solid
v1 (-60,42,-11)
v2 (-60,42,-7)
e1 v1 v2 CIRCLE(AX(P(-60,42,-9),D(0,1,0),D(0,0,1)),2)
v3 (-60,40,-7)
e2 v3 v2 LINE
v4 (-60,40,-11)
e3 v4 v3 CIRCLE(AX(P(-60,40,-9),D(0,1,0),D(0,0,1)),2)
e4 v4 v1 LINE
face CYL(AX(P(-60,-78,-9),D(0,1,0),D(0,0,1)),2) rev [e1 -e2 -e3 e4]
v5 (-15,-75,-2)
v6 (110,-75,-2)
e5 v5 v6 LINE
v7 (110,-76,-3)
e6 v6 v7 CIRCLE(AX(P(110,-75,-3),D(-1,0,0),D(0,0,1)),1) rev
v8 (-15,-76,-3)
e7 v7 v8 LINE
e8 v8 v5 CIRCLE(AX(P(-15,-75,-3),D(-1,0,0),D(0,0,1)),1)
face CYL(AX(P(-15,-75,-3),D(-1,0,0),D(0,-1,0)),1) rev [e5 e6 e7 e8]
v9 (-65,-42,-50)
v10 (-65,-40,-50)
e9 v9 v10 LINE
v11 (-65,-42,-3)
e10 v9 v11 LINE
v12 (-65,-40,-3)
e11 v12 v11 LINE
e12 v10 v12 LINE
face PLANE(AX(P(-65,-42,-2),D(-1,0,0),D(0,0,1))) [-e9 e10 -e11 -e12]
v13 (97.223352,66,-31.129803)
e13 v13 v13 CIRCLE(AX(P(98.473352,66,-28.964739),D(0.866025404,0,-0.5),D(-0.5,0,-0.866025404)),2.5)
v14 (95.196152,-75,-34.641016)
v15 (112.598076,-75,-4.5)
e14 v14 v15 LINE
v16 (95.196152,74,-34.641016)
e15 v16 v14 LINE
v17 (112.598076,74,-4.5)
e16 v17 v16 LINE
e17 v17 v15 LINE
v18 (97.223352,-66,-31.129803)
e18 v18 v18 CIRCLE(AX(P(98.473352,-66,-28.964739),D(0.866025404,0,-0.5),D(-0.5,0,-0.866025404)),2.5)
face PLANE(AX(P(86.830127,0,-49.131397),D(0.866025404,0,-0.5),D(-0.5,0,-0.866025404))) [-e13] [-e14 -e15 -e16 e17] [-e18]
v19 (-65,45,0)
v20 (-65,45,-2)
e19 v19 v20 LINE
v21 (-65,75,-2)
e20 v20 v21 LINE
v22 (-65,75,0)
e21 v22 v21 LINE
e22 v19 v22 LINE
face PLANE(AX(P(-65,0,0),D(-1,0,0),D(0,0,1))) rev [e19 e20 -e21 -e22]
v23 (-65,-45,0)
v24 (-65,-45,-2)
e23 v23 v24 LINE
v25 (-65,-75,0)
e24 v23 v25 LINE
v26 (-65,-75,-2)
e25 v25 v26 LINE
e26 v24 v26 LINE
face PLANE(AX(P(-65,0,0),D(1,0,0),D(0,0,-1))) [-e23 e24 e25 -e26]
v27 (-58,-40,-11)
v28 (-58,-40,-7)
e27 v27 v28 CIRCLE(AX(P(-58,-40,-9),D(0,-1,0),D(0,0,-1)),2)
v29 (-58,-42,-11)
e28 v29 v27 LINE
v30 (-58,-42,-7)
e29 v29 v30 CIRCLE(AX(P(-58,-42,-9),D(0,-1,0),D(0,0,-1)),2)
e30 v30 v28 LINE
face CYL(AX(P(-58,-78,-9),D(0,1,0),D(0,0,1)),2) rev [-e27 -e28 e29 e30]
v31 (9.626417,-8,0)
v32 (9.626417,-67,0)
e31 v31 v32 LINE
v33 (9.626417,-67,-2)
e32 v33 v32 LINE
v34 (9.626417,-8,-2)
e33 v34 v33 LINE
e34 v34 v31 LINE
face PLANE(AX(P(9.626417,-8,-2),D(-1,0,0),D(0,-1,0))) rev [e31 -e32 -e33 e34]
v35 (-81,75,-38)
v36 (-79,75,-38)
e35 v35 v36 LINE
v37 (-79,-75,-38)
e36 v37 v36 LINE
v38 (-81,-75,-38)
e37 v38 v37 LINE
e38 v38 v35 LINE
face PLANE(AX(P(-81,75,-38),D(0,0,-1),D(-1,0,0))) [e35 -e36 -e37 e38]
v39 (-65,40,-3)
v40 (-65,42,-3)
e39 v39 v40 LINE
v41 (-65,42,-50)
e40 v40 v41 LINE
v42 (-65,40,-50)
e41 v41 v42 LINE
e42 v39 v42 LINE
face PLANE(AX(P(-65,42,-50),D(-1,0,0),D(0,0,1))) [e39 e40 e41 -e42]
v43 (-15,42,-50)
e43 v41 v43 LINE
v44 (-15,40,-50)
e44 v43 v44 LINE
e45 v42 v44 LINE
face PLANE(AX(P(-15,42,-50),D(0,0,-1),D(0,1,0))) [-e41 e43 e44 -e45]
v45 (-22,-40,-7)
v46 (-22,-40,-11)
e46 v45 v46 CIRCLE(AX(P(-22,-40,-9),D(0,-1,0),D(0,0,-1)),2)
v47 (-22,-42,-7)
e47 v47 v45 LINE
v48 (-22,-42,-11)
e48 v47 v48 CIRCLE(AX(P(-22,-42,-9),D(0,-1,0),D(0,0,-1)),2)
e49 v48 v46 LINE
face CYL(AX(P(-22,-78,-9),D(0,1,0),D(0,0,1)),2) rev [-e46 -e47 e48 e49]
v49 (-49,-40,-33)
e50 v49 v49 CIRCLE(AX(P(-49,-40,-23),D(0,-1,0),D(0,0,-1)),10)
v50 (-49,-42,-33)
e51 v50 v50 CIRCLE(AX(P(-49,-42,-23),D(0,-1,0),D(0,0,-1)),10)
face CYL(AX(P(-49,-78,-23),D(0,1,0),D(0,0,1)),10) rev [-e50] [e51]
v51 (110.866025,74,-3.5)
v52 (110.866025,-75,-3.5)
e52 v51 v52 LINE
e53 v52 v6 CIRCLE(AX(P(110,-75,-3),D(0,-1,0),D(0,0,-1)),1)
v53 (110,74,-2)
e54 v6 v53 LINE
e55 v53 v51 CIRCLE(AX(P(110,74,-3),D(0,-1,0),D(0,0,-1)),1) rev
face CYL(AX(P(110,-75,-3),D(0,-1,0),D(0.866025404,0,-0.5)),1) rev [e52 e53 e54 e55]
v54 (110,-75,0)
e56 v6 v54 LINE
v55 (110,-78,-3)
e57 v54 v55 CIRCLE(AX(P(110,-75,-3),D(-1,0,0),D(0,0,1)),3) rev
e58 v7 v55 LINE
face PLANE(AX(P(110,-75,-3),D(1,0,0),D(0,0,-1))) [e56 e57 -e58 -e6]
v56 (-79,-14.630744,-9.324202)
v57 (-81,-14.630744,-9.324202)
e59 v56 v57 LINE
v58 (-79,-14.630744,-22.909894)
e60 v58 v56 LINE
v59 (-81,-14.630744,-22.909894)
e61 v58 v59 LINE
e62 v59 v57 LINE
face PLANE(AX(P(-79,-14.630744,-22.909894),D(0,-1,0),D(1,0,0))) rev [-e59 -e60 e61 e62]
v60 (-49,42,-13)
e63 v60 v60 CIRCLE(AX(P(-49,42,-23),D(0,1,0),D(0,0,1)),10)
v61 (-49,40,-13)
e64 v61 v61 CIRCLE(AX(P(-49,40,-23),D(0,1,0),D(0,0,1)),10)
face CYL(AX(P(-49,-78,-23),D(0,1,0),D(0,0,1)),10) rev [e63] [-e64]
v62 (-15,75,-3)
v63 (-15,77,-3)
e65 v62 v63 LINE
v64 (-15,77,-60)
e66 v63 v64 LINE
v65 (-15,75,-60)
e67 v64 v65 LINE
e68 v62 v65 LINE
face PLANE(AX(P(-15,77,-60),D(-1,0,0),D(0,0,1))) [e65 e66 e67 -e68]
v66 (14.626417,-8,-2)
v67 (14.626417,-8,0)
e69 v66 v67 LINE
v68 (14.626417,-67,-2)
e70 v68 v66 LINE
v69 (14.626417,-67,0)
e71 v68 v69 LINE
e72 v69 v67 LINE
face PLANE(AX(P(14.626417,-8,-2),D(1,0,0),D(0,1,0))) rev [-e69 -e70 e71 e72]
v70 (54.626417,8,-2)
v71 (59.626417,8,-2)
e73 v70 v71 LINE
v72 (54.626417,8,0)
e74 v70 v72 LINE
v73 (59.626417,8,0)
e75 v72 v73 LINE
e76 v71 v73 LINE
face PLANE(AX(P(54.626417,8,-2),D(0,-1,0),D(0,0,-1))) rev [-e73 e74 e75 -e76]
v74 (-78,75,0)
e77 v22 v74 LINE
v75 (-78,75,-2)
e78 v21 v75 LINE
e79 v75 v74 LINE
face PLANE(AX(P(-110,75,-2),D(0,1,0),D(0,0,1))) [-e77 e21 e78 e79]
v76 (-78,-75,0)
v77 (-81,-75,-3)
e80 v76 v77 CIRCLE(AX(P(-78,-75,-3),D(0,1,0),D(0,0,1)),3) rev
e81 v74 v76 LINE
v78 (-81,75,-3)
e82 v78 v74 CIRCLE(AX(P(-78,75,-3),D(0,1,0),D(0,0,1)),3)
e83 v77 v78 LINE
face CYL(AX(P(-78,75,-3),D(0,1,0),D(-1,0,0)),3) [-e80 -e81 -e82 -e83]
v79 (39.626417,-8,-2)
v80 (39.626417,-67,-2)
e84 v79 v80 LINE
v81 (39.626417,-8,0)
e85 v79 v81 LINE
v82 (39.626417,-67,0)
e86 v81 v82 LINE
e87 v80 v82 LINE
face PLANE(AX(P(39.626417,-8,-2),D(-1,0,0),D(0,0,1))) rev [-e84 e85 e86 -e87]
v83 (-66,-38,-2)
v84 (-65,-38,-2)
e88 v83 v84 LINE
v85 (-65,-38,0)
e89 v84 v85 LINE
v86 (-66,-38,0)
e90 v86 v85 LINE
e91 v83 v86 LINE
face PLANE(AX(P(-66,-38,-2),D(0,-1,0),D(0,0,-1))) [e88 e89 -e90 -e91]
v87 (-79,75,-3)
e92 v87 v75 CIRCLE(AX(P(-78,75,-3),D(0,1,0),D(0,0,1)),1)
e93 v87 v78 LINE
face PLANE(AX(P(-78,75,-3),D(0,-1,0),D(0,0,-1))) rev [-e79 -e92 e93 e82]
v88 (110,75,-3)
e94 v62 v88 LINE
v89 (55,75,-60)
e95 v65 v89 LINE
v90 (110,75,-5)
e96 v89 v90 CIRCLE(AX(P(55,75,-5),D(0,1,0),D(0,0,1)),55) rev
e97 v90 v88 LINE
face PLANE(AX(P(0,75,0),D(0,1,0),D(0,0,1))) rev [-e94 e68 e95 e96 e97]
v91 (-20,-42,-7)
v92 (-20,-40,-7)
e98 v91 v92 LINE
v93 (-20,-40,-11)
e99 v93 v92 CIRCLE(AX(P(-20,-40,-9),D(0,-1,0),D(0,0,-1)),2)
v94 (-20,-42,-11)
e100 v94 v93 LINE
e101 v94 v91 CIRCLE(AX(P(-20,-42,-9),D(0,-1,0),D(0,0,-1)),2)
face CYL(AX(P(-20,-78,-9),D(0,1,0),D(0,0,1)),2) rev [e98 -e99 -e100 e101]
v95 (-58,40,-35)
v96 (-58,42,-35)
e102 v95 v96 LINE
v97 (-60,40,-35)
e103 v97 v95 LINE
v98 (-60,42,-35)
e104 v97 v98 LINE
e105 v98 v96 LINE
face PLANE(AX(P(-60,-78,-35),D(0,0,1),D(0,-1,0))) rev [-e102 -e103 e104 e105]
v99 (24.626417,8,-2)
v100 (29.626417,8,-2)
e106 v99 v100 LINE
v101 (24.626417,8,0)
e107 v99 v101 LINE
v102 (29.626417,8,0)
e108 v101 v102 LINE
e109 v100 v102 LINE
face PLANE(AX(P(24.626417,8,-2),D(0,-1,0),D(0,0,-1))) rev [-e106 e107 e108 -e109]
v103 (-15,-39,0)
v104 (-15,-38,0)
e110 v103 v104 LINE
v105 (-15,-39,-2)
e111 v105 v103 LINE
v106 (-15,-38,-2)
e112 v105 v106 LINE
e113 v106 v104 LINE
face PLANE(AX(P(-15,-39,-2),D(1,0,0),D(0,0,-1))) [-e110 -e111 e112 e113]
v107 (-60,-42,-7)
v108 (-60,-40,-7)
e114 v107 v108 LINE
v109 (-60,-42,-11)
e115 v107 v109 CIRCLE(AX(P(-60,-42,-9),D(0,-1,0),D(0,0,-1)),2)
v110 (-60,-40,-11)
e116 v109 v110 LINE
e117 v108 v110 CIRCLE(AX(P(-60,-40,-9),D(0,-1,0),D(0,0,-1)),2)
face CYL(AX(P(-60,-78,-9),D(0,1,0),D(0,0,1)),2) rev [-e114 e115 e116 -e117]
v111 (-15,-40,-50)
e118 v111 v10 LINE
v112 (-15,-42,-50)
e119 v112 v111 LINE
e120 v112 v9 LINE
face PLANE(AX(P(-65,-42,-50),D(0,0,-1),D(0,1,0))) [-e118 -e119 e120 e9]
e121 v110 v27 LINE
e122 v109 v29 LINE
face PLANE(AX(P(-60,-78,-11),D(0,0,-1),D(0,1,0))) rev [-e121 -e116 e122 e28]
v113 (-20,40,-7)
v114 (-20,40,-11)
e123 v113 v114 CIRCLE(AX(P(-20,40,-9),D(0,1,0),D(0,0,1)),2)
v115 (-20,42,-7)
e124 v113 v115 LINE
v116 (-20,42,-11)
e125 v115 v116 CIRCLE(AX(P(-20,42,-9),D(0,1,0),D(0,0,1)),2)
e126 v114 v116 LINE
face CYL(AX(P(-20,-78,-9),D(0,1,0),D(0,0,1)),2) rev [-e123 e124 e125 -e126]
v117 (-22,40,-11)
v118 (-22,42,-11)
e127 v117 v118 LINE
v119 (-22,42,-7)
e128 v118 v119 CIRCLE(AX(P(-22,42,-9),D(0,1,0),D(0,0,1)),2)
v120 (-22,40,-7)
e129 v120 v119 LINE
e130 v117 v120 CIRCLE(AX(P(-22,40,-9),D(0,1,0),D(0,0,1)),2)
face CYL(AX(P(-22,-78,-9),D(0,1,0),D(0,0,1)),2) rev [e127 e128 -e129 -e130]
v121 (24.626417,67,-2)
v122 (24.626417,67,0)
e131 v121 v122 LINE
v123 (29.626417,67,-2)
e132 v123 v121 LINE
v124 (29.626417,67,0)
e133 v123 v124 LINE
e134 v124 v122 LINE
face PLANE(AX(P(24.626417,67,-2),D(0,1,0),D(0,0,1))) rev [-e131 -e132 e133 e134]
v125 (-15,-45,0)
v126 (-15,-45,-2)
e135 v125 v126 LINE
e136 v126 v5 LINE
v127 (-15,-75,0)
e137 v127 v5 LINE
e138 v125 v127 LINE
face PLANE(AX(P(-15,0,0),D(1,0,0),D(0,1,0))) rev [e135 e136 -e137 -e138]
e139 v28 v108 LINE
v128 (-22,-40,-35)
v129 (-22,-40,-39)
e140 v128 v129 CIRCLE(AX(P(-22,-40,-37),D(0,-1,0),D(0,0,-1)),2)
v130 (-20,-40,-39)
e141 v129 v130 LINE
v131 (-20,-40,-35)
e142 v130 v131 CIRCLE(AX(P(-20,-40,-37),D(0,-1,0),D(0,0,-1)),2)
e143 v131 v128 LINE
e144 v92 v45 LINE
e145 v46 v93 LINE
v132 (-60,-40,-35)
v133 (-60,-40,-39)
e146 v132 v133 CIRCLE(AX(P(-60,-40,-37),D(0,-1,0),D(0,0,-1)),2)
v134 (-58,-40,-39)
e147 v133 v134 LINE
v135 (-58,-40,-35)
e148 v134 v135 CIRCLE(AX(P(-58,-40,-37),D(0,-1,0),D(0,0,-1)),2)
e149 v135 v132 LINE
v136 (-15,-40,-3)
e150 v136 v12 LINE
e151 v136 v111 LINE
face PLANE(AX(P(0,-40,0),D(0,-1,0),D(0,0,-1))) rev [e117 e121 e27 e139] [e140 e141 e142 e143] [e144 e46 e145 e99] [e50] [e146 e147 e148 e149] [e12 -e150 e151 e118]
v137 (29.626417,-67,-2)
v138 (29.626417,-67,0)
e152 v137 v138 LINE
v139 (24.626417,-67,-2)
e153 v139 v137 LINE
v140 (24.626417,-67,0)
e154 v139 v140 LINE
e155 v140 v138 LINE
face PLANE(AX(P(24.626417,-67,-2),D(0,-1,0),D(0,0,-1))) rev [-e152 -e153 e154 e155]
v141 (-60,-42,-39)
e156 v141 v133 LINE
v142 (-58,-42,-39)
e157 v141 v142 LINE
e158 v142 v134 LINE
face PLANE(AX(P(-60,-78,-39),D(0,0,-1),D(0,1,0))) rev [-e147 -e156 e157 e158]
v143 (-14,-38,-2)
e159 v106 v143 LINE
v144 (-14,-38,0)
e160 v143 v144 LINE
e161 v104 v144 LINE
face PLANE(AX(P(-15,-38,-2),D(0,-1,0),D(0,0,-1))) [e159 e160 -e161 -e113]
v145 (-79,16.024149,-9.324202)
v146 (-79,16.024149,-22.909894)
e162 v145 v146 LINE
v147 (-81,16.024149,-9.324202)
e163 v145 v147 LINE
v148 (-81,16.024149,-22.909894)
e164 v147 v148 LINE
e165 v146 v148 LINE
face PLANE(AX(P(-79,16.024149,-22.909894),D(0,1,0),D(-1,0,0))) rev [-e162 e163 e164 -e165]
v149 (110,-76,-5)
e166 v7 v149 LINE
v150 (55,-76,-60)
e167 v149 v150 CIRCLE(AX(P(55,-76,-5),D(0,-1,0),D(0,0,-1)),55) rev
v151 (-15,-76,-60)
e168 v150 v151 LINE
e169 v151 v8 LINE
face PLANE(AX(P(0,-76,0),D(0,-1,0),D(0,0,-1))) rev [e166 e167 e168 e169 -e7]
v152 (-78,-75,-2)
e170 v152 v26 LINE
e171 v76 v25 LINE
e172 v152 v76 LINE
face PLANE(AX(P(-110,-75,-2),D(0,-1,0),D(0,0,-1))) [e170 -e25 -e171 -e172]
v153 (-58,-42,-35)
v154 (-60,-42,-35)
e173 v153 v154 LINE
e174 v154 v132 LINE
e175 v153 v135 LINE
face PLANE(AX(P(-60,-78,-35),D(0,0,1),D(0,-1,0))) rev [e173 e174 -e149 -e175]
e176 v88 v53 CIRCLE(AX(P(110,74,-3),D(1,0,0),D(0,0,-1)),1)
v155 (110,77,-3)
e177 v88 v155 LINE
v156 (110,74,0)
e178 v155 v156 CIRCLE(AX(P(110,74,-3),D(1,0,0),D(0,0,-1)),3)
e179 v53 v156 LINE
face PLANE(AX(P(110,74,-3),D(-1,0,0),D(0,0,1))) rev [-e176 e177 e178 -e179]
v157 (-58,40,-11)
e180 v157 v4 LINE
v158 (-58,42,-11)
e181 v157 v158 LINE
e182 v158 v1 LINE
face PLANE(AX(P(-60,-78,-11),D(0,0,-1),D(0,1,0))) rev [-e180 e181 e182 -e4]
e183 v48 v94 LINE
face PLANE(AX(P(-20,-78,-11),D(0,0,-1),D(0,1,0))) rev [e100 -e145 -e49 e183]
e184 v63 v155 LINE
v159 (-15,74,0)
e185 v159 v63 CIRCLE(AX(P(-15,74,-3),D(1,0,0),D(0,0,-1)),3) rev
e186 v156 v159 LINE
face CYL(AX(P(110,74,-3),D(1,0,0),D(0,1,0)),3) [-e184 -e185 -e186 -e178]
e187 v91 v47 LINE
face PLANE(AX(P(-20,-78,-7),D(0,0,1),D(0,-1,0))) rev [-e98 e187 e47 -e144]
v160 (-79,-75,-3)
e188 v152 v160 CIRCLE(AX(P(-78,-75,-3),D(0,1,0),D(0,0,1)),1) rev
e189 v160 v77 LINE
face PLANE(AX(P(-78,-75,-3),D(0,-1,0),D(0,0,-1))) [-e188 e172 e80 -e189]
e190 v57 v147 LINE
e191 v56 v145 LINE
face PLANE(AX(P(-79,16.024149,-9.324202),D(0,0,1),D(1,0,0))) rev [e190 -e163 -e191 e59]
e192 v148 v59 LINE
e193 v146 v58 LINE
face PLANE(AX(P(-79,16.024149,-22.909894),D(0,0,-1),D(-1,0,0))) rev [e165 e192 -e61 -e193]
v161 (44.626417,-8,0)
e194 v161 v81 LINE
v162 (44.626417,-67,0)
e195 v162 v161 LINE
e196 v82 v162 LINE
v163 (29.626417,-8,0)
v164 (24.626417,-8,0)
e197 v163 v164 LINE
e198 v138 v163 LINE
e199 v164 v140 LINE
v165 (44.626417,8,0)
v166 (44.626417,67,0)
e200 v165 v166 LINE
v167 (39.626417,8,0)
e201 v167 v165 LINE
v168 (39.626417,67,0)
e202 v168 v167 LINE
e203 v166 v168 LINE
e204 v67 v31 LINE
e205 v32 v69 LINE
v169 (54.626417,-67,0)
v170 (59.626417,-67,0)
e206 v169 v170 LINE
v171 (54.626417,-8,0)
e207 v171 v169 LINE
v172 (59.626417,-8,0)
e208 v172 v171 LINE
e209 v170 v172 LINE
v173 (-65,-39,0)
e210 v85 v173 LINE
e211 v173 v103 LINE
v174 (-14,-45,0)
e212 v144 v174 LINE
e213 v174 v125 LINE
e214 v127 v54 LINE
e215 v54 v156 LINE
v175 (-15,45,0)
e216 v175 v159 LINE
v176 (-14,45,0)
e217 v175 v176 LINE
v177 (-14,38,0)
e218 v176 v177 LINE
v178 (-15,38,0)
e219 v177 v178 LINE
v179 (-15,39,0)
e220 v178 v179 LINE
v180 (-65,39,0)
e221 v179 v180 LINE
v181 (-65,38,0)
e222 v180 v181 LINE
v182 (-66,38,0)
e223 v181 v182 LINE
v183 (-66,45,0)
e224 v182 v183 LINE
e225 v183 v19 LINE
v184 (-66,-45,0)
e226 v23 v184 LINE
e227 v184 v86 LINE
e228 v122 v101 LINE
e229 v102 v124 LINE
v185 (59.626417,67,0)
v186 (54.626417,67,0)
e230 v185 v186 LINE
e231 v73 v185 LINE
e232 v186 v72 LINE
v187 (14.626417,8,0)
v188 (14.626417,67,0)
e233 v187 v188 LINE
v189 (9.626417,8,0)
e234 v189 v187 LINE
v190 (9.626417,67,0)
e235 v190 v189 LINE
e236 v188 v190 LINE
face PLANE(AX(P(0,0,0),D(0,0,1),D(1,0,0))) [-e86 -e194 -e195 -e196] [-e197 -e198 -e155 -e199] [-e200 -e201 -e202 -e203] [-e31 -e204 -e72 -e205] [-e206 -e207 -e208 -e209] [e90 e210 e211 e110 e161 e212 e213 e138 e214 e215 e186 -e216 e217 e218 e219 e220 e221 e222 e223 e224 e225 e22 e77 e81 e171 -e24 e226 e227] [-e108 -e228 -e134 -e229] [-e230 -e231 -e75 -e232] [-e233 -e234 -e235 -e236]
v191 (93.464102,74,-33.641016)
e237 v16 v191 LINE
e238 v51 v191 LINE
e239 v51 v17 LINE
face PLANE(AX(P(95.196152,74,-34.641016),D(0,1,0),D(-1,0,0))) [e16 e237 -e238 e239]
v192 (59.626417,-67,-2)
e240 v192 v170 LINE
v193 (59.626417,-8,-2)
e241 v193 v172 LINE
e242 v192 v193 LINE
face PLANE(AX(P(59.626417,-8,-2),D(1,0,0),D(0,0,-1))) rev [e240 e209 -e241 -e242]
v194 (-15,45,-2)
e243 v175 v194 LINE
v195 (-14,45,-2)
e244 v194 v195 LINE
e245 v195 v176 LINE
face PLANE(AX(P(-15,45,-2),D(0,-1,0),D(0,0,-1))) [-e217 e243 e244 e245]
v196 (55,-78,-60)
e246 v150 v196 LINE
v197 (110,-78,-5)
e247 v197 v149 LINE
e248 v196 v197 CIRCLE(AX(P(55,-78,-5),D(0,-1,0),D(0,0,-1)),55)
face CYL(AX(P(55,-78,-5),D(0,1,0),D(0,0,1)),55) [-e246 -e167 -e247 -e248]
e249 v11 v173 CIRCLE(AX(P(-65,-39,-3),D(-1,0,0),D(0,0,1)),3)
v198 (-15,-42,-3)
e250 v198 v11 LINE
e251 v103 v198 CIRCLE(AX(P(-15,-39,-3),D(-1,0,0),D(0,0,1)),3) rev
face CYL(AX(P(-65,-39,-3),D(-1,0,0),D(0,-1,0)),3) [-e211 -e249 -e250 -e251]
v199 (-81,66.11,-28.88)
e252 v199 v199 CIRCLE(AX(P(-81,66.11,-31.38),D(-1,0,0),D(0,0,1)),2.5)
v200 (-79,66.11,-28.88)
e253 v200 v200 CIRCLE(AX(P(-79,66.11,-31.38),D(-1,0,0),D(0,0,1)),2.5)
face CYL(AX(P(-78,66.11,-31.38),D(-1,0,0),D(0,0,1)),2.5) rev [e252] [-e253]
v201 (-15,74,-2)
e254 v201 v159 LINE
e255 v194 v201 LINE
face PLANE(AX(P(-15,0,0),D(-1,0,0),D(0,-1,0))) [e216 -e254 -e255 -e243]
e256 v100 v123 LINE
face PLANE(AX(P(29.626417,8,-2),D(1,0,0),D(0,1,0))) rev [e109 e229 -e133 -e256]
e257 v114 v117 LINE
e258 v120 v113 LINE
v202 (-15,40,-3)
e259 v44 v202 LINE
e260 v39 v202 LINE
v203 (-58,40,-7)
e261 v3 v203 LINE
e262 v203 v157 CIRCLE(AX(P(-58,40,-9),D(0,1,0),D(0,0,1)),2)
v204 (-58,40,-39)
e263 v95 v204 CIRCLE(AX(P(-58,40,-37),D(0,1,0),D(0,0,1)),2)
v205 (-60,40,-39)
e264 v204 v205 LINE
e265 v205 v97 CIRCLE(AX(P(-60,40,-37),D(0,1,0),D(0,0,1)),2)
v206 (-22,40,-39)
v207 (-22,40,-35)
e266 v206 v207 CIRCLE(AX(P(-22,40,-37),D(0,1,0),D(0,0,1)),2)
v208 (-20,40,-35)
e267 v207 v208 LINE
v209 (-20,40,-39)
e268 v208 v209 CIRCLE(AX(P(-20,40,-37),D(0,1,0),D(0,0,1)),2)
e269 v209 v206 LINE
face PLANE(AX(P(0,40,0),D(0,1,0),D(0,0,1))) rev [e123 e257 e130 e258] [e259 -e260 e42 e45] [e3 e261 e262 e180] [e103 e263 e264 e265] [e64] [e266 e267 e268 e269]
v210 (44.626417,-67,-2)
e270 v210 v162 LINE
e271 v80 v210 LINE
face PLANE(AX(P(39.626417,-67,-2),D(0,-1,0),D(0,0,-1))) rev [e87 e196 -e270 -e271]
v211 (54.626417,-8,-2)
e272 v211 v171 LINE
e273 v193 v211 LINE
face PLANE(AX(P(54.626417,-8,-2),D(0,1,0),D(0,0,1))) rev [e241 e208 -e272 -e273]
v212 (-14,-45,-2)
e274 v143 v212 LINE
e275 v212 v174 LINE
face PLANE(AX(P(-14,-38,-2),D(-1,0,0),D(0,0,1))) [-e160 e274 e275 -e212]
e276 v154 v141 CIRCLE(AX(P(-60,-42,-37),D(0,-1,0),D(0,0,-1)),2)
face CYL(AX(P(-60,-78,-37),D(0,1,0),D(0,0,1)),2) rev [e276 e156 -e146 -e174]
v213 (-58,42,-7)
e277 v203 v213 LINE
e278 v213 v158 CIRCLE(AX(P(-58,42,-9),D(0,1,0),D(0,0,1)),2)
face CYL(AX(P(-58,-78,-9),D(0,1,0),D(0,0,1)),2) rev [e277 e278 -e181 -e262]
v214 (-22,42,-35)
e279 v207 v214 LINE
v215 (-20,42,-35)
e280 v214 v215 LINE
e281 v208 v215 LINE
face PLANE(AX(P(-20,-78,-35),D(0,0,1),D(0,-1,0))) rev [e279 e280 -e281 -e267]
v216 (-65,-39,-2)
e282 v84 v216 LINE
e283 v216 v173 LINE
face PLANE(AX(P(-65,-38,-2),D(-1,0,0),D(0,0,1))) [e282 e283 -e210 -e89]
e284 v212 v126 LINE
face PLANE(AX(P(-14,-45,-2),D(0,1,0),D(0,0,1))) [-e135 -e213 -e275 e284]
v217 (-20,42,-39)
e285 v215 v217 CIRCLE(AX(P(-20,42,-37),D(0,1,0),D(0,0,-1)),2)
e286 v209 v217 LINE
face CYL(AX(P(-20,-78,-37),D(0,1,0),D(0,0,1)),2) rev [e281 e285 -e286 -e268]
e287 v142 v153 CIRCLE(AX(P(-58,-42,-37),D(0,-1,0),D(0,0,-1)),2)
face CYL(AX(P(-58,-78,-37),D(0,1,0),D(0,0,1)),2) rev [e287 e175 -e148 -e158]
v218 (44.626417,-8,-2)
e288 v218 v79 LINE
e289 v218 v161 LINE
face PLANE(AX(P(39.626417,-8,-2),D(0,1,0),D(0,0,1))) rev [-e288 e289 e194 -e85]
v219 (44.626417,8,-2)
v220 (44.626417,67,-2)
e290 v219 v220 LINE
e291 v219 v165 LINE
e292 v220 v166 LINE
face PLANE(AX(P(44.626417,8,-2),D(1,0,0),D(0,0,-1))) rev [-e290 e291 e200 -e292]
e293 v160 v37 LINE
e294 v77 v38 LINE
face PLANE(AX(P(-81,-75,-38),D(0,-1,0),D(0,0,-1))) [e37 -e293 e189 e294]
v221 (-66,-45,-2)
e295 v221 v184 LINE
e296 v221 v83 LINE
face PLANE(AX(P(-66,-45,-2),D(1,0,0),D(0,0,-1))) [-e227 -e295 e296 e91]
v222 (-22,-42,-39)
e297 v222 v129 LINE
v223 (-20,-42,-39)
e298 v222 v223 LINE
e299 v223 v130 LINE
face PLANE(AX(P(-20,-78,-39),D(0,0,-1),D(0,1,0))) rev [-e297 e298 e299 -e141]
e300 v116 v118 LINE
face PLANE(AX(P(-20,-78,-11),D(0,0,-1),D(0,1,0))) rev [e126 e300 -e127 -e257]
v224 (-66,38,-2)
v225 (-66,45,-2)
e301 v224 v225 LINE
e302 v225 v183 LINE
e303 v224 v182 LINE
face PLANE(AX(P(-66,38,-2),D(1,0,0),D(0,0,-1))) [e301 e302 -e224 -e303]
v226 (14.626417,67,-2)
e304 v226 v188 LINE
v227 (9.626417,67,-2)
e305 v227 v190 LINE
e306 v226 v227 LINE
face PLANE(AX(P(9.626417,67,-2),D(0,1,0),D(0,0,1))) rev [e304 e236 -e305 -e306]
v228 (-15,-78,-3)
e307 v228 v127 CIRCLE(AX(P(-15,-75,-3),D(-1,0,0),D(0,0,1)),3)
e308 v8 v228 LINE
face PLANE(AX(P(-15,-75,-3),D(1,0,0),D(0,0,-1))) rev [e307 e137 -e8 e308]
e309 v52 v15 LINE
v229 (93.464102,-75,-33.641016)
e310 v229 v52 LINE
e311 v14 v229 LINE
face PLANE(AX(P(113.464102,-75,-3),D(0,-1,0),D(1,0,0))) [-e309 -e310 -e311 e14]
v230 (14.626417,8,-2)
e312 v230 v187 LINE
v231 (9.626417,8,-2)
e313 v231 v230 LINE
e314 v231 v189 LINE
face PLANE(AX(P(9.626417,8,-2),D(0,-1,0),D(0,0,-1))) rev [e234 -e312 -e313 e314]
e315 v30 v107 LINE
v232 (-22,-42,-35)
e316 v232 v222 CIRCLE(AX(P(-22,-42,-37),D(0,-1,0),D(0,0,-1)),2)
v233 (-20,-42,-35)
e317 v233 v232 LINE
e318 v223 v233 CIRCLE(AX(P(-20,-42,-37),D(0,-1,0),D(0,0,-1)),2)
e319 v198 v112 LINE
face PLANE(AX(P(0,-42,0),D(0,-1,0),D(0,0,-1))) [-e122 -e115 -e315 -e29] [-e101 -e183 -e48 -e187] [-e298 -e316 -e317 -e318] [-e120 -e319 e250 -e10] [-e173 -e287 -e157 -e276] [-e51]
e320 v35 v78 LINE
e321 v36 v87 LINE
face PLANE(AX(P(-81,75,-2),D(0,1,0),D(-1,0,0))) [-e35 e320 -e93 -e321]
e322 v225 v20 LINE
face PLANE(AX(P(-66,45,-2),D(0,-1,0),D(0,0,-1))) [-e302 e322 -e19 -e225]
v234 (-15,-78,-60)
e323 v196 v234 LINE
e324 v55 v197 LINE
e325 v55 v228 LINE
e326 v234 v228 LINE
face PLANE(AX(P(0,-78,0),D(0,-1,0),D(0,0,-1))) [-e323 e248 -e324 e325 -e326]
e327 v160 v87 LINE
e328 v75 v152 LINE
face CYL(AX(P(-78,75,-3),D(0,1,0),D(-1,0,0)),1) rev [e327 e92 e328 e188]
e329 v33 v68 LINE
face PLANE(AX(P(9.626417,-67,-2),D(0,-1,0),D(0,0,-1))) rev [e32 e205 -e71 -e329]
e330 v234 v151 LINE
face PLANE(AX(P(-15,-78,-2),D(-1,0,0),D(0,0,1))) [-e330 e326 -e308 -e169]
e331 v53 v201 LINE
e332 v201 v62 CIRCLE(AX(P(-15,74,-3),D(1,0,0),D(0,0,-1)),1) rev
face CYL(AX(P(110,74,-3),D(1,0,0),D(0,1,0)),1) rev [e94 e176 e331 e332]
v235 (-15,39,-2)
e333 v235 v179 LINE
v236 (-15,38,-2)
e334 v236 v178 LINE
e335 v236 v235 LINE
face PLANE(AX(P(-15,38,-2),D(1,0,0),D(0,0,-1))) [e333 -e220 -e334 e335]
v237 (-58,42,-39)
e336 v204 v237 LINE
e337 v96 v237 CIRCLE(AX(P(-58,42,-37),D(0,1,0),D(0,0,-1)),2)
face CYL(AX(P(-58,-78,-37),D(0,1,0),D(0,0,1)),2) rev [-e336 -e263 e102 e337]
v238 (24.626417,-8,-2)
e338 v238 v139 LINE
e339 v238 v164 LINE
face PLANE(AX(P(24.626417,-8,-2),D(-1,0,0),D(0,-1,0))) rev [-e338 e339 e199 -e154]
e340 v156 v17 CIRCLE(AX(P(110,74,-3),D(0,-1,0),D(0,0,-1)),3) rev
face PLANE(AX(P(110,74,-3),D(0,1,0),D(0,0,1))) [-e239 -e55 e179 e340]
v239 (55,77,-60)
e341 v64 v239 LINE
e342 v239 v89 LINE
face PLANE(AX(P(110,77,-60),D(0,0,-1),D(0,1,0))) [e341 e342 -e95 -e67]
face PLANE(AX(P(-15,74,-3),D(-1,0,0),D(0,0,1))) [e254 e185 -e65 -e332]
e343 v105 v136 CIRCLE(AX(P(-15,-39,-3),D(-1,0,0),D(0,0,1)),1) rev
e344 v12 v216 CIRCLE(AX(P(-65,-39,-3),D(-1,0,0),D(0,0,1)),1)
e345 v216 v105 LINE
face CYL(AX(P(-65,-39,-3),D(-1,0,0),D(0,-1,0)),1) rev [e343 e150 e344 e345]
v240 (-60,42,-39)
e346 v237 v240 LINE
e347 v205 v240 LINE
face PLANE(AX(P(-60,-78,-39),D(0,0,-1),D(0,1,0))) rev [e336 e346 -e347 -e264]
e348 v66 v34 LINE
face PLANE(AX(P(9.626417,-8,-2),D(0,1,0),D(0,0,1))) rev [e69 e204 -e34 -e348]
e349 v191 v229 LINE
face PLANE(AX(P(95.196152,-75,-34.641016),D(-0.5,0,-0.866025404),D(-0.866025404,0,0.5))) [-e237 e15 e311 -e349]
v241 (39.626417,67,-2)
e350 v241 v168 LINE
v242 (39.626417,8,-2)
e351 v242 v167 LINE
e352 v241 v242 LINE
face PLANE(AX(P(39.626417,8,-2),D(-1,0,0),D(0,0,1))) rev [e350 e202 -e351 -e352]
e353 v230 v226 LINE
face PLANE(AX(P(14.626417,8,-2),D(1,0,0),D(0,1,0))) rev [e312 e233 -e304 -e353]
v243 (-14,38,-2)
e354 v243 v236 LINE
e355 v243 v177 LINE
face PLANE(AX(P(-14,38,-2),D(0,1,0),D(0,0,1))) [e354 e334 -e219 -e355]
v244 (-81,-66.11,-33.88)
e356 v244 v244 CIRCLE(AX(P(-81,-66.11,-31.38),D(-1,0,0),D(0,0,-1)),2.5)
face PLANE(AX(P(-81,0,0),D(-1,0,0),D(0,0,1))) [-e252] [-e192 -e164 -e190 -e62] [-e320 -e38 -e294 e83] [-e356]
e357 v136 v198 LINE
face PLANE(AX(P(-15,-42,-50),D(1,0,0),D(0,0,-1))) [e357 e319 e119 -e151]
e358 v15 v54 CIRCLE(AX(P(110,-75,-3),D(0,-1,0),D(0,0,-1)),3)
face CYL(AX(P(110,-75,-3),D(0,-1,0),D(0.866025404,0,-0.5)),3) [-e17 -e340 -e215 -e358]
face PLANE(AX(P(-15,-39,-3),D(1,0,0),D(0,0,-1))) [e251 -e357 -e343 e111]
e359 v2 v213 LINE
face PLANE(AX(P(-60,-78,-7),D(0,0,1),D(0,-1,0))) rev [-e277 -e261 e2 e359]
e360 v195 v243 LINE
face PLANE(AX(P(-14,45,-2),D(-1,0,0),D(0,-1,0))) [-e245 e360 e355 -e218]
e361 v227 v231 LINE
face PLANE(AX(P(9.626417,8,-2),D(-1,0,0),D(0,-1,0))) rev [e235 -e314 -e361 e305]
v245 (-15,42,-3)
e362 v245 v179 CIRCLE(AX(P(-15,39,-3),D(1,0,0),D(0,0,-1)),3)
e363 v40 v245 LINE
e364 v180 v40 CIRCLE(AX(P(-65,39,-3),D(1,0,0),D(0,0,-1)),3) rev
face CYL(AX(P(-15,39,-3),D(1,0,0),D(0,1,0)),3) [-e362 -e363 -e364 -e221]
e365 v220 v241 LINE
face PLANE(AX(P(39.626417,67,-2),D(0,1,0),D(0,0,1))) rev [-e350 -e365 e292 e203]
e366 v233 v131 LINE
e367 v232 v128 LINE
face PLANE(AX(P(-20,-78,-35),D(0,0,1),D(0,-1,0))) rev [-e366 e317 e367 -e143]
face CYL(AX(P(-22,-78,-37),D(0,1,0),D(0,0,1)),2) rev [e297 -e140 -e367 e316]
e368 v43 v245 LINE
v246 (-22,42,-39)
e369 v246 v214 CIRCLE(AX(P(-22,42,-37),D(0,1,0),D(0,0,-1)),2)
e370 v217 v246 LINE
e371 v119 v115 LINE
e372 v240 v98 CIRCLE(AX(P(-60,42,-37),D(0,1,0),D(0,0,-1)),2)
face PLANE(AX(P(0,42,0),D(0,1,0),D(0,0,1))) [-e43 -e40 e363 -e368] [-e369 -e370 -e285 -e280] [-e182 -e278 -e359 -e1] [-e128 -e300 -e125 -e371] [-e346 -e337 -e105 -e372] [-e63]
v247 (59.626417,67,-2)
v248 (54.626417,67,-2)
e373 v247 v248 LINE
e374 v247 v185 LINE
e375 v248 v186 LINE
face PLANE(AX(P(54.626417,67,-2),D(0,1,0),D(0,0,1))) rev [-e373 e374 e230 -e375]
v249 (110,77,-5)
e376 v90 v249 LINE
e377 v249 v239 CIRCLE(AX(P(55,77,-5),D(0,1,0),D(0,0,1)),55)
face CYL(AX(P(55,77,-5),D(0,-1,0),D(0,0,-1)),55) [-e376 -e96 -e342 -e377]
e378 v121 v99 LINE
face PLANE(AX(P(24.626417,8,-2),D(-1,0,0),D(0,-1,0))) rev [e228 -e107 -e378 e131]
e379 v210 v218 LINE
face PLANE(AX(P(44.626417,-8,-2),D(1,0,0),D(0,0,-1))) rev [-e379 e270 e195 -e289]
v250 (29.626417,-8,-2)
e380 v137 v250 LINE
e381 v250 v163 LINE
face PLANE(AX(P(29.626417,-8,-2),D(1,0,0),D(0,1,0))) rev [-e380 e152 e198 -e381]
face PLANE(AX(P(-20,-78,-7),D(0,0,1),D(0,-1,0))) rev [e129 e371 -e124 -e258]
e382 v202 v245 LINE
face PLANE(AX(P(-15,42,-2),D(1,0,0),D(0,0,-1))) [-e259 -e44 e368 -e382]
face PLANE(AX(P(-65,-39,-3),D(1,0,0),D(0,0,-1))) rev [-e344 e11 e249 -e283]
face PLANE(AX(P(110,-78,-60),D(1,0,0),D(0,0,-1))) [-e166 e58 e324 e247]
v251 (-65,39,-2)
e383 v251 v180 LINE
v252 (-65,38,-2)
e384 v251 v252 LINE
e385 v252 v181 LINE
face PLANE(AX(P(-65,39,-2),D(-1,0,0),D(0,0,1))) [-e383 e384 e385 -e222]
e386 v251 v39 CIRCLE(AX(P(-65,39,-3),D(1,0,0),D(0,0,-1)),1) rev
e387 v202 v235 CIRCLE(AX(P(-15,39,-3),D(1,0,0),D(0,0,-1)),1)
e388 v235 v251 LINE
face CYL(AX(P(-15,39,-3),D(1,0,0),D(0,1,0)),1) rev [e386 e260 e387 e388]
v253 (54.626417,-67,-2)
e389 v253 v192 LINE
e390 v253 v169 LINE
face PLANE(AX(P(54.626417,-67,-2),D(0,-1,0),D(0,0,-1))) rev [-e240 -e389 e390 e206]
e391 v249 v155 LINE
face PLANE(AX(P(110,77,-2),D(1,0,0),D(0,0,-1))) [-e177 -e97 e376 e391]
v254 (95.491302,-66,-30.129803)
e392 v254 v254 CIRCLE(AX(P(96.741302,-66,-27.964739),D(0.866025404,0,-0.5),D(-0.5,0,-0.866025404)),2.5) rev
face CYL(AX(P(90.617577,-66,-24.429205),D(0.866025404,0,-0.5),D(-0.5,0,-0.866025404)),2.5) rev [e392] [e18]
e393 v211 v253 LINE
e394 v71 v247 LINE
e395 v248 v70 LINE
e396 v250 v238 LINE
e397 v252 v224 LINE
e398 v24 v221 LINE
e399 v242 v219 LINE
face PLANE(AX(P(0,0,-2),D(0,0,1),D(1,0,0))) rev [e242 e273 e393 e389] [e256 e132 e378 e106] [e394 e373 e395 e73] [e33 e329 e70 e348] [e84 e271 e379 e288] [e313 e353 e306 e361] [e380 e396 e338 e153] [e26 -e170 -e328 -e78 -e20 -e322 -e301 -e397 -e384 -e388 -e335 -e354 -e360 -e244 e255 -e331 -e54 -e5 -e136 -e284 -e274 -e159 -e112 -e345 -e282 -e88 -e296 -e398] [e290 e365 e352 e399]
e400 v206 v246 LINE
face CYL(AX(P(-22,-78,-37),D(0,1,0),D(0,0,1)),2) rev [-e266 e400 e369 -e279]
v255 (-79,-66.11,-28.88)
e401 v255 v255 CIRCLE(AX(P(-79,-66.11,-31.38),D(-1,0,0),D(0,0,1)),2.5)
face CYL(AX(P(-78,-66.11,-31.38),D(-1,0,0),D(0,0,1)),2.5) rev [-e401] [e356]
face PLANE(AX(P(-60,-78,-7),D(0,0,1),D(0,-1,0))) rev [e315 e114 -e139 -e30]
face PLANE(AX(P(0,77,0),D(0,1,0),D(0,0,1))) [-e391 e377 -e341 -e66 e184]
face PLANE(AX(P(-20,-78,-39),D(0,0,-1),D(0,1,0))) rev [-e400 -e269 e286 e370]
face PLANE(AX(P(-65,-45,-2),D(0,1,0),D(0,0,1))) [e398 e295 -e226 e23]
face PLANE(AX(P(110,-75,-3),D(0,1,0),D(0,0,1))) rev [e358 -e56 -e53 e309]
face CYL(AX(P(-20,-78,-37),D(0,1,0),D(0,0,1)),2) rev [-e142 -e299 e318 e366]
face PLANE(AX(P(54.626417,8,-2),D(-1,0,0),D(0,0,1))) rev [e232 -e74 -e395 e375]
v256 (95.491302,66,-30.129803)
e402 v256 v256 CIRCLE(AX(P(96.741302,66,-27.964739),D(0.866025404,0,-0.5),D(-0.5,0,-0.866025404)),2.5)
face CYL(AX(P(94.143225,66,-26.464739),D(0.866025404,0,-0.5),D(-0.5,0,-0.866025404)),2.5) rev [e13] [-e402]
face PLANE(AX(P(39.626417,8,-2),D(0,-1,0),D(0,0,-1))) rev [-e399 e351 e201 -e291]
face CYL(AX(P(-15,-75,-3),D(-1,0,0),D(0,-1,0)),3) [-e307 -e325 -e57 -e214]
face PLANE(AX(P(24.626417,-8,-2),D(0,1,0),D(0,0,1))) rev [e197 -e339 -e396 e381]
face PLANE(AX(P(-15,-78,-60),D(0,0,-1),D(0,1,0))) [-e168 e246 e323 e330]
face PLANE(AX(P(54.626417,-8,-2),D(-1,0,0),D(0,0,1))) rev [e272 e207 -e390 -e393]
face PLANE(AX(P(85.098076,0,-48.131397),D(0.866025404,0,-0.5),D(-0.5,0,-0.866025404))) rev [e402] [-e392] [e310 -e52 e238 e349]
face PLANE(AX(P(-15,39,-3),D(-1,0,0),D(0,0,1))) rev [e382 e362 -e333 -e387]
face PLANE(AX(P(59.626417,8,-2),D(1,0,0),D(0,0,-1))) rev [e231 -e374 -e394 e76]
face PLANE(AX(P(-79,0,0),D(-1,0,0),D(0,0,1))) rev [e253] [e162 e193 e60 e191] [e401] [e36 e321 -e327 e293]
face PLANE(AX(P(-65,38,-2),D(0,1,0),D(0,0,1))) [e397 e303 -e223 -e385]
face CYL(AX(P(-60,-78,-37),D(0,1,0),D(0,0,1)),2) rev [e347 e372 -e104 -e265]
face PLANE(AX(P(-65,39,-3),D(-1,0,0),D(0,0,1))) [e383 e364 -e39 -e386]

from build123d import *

# Parameters (mm, degrees)
SKETCH7_W                     = 220
SKETCH7_H                     = 150
BASE_FLANGE4_DEPTH            = 2
SKETCH38_W                    = 5
SKETCH38_H                    = 59
CUT_EXTRUDE9_DEPTH            = 10
EDGE_FLANGE9_STRIP_W          = 41
EDGE_FLANGE9_STRIP_H          = 2
EDGE_FLANGE9_STRIP_CUT_DEPTH  = 150
EDGE_FLANGE9_DEPTH            = 150
SKETCH22_W                    = 27.5
SKETCH22_H                    = 30
SKETCH22_W_2                  = 22.5
CUT_EXTRUDE14_DEPTH           = 2
EDGE_FLANGE13_START           = -66
EDGE_FLANGE13_DEPTH           = 52
EDGE_FLANGE13_2_DEPTH         = 1
EDGE_FLANGE13_START_2         = -15
EDGE_FLANGE13_3_DEPTH         = 1
EDGE_FLANGE13_START_3         = -65
EDGE_FLANGE13_4_DEPTH         = 50
EDGE_FLANGE14_START           = -66
EDGE_FLANGE14_DEPTH           = 52
EDGE_FLANGE14_2_DEPTH         = 1
EDGE_FLANGE14_START_2         = -15
EDGE_FLANGE14_3_DEPTH         = 1
EDGE_FLANGE14_START_3         = -65
EDGE_FLANGE14_4_DEPTH         = 50
SKETCH147_W                   = 13.585691309
SKETCH147_H                   = 30.654893209
CUT_EXTRUDE18_DEPTH           = 2
EDGE_FLANGE15_STRIP_W         = 10
EDGE_FLANGE15_STRIP_H         = 2
EDGE_FLANGE15_STRIP_CUT_DEPTH = 125
EDGE_FLANGE15_DEPTH           = 125
EDGE_FLANGE16_DEPTH           = 125
EDGE_FLANGE17_DEPTH           = 149
BREAK_CORNER4_START           = -78
BREAK_CORNER4_DEPTH           = 2
BREAK_CORNER4_START_2         = 75
BREAK_CORNER4_2_DEPTH         = 2
SKETCH164_R                   = 10
CUT_EXTRUDE20_DEPTH           = 176.410946067
SKETCH166_R                   = 2.5
CUT_EXTRUDE21_DEPTH           = 2
SKETCH167_R                   = 2.5
CUT_EXTRUDE24_DEPTH           = 5
SKETCH170_R                   = 2.5
CUT_EXTRUDE25_DEPTH           = 3


# Read off the part's stored shape, not the designer's step: Edge-Flange13, Edge-Flange14, Break-Corner4
# Sheet-metal steps are written as plain solids
with BuildPart() as part:
    # Sketch7 → Base-Flange4 (new body)
    with BuildSketch(Plane.XY):
        Rectangle(SKETCH7_W, SKETCH7_H)
    extrude(amount=-BASE_FLANGE4_DEPTH)

    # Sketch38 → Cut-Extrude9 (cut)
    with BuildSketch(Plane.XY):
        with Locations((12.126416544, -37.5)):
            Rectangle(SKETCH38_W, SKETCH38_H)
        with Locations((27.126416544, -37.5)):
            Rectangle(SKETCH38_W, SKETCH38_H)
        with Locations((42.126416544, -37.5)):
            Rectangle(SKETCH38_W, SKETCH38_H)
        with Locations((57.126416544, -37.5)):
            Rectangle(SKETCH38_W, SKETCH38_H)
        with Locations((57.126416544, 37.5)):
            Rectangle(SKETCH38_W, SKETCH38_H)
        with Locations((42.126416544, 37.5)):
            Rectangle(SKETCH38_W, SKETCH38_H)
        with Locations((27.126416544, 37.5)):
            Rectangle(SKETCH38_W, SKETCH38_H)
        with Locations((12.126416544, 37.5)):
            Rectangle(SKETCH38_W, SKETCH38_H)
    extrude(amount=-CUT_EXTRUDE9_DEPTH, mode=Mode.SUBTRACT)

    # Edge-Flange9 strip (across the edge) → Edge-Flange9 strip cut (cut)
    with BuildSketch(Plane(origin=(-79, -75, -2), x_dir=(1, 0, 0), z_dir=(0, 1, 0))):
        with Locations((-19.5, -1)):
            Rectangle(EDGE_FLANGE9_STRIP_W, EDGE_FLANGE9_STRIP_H)
    extrude(amount=EDGE_FLANGE9_STRIP_CUT_DEPTH, mode=Mode.SUBTRACT)

    # Edge-Flange9 section (across the edge) → Edge-Flange9 (add)
    with BuildSketch(Plane(origin=(-79, -75, -2), x_dir=(1, 0, 0), z_dir=(0, 1, 0))):
        with BuildLine():
            Line((-2, 1), (-2, 36))
            Line((-2, 36), (0, 36))
            Line((0, 36), (0, 1))
            ThreePointArc((0, 1), (0.292893219, 0.292893219), (1, 0))
            Line((1, 0), (1, -2))
            ThreePointArc((1, -2), (-1.121320344, -1.121320344), (-2, 1))
        make_face()
    extrude(amount=EDGE_FLANGE9_DEPTH)

    # Sketch22 → Cut-Extrude14 (cut)
    with BuildSketch(Plane(origin=(0, 0, -2), x_dir=(-1, 0, 0), z_dir=(0, 0, -1))):
        with Locations((51.25, 60)):
            Rectangle(SKETCH22_W, SKETCH22_H)
        with Locations((26.25, 60)):
            Rectangle(SKETCH22_W_2, SKETCH22_H)
        Polygon((65, -45), (37.5, -45), (15, -45), (15, -75), (65, -75), align=None)
    extrude(amount=-CUT_EXTRUDE14_DEPTH, mode=Mode.SUBTRACT)

    # Edge-Flange13 outline → Edge-Flange13 (cut)
    with BuildSketch(Plane.YZ.offset(EDGE_FLANGE13_START)):
        with BuildLine():
            Line((-45, 0), (-45, -2))
            Line((-45, -2), (-41.828427125, -2))
            ThreePointArc((-41.828427125, -2), (-40.732050808, -0.550510257), (-39, 0))
            Line((-39, 0), (-45, 0))
        make_face()
    extrude(amount=EDGE_FLANGE13_DEPTH, mode=Mode.SUBTRACT)

    # Edge-Flange13 2 outline → Edge-Flange13 2 (cut)
    with BuildSketch(Plane.YZ.offset(EDGE_FLANGE13_START)):
        with BuildLine():
            ThreePointArc((-39, 0), (-40.732050808, -0.550510257), (-41.828427125, -2))
            Line((-41.828427125, -2), (-38, -2))
            Line((-38, -2), (-38, 0))
            Line((-38, 0), (-39, 0))
        make_face()
    extrude(amount=EDGE_FLANGE13_2_DEPTH, mode=Mode.SUBTRACT)

    # Edge-Flange13 3 outline → Edge-Flange13 3 (cut)
    with BuildSketch(Plane.YZ.offset(EDGE_FLANGE13_START_2)):
        with BuildLine():
            ThreePointArc((-39, 0), (-40.732050808, -0.550510257), (-41.828427125, -2))
            Line((-41.828427125, -2), (-38, -2))
            Line((-38, -2), (-38, 0))
            Line((-38, 0), (-39, 0))
        make_face()
    extrude(amount=EDGE_FLANGE13_3_DEPTH, mode=Mode.SUBTRACT)

    # Edge-Flange13 4 outline → Edge-Flange13 4 (add)
    with BuildSketch(Plane.YZ.offset(EDGE_FLANGE13_START_3)):
        with BuildLine():
            Line((-39, -2), (-41.828427125, -2))
            ThreePointArc((-41.828427125, -2), (-41.956795679, -2.492694064), (-42, -3))
            Line((-42, -3), (-42, -50))
            Line((-42, -50), (-40, -50))
            Line((-40, -50), (-40, -3))
            ThreePointArc((-40, -3), (-39.707106781, -2.292893219), (-39, -2))
        make_face()
    extrude(amount=EDGE_FLANGE13_4_DEPTH)

    # Edge-Flange14 outline → Edge-Flange14 (cut)
    with BuildSketch(Plane.YZ.offset(EDGE_FLANGE14_START)):
        with BuildLine():
            ThreePointArc((39, 0), (40.732050808, -0.550510257), (41.828427125, -2))
            Line((41.828427125, -2), (45, -2))
            Line((45, -2), (45, 0))
            Line((45, 0), (39, 0))
        make_face()
    extrude(amount=EDGE_FLANGE14_DEPTH, mode=Mode.SUBTRACT)

    # Edge-Flange14 2 outline → Edge-Flange14 2 (cut)
    with BuildSketch(Plane.YZ.offset(EDGE_FLANGE14_START)):
        with BuildLine():
            Line((38, -2), (41.828427125, -2))
            ThreePointArc((41.828427125, -2), (40.732050808, -0.550510257), (39, 0))
            Line((39, 0), (38, 0))
            Line((38, 0), (38, -2))
        make_face()
    extrude(amount=EDGE_FLANGE14_2_DEPTH, mode=Mode.SUBTRACT)

    # Edge-Flange14 3 outline → Edge-Flange14 3 (cut)
    with BuildSketch(Plane.YZ.offset(EDGE_FLANGE14_START_2)):
        with BuildLine():
            Line((38, -2), (41.828427125, -2))
            ThreePointArc((41.828427125, -2), (40.732050808, -0.550510257), (39, 0))
            Line((39, 0), (38, 0))
            Line((38, 0), (38, -2))
        make_face()
    extrude(amount=EDGE_FLANGE14_3_DEPTH, mode=Mode.SUBTRACT)

    # Edge-Flange14 4 outline → Edge-Flange14 4 (add)
    with BuildSketch(Plane.YZ.offset(EDGE_FLANGE14_START_3)):
        with BuildLine():
            Line((40, -3), (40, -50))
            Line((40, -50), (42, -50))
            Line((42, -50), (42, -3))
            ThreePointArc((42, -3), (41.956795679, -2.492694064), (41.828427125, -2))
            Line((41.828427125, -2), (39, -2))
            ThreePointArc((39, -2), (39.707106781, -2.292893219), (40, -3))
        make_face()
    extrude(amount=EDGE_FLANGE14_4_DEPTH)

    # Sketch147 → Cut-Extrude18 (cut)
    with BuildSketch(Plane.ZY.offset(81)):
        with Locations((-16.117047991, 0.696702118)):
            Rectangle(SKETCH147_W, SKETCH147_H)
    extrude(amount=-CUT_EXTRUDE18_DEPTH, mode=Mode.SUBTRACT)

    # Edge-Flange15 strip (across the edge) → Edge-Flange15 strip cut (cut)
    with BuildSketch(Plane(origin=(-15, 75, -2), x_dir=(0, -1, 0), z_dir=(1, 0, 0))):
        with Locations((-4, -1)):
            Rectangle(EDGE_FLANGE15_STRIP_W, EDGE_FLANGE15_STRIP_H)
    extrude(amount=EDGE_FLANGE15_STRIP_CUT_DEPTH, mode=Mode.SUBTRACT)

    # Edge-Flange15 section (across the edge) → Edge-Flange15 (add)
    with BuildSketch(Plane(origin=(-15, 75, -2), x_dir=(0, -1, 0), z_dir=(1, 0, 0))):
        with BuildLine():
            Line((-2, 1), (-2, 58))
            Line((-2, 58), (0, 58))
            Line((0, 58), (0, 1))
            ThreePointArc((0, 1), (0.292893219, 0.292893219), (1, 0))
            Line((1, 0), (1, -2))
            ThreePointArc((1, -2), (-1.121320344, -1.121320344), (-2, 1))
        make_face()
    extrude(amount=EDGE_FLANGE15_DEPTH)

    # Edge-Flange16 section (across the edge) → Edge-Flange16 (add)
    with BuildSketch(Plane(origin=(110, -76, -2), x_dir=(0, 1, 0), z_dir=(-1, 0, 0))):
        with BuildLine():
            Line((-2, 1), (-2, 58))
            Line((-2, 58), (0, 58))
            Line((0, 58), (0, 1))
            ThreePointArc((0, 1), (0.292893219, 0.292893219), (1, 0))
            Line((1, 0), (1, -2))
            ThreePointArc((1, -2), (-1.121320344, -1.121320344), (-2, 1))
        make_face()
    extrude(amount=EDGE_FLANGE16_DEPTH)

    # Edge-Flange17 section (across the edge) → Edge-Flange17 (add)
    with BuildSketch(Plane(origin=(111.732050808, 74, -2), x_dir=(-0.8660254037844398, 0, 0.499999999999998), z_dir=(0, -1, 0))):
        with BuildLine():
            Line((-2, 1.732050808), (-2, 36.535898385))
            Line((-2, 36.535898385), (0, 36.535898385))
            Line((0, 36.535898385), (0, 1.732050808))
            ThreePointArc((0, 1.732050808), (0.5, 0.866025404), (1.5, 0.866025404))
            Line((1.5, 0.866025404), (2.5, -0.866025404))
            ThreePointArc((2.5, -0.866025404), (-0.5, -0.866025404), (-2, 1.732050808))
        make_face()
    extrude(amount=EDGE_FLANGE17_DEPTH)

    # Break-Corner4 outline → Break-Corner4 (cut)
    with BuildSketch(Plane(origin=(0, 0, 0), x_dir=(1, 0, 0), z_dir=(0, 1, 0)).offset(BREAK_CORNER4_START)):
        with BuildLine():
            ThreePointArc((55, 60), (93.890872965, 43.890872965), (110, 5))
            Line((110, 5), (110, 60))
            Line((110, 60), (55, 60))
        make_face()
    extrude(amount=BREAK_CORNER4_DEPTH, mode=Mode.SUBTRACT)

    # Break-Corner4 2 outline → Break-Corner4 2 (cut)
    with BuildSketch(Plane(origin=(0, 0, 0), x_dir=(1, 0, 0), z_dir=(0, 1, 0)).offset(BREAK_CORNER4_START_2)):
        with BuildLine():
            ThreePointArc((55, 60), (93.890872965, 43.890872965), (110, 5))
            Line((110, 5), (110, 60))
            Line((110, 60), (55, 60))
        make_face()
    extrude(amount=BREAK_CORNER4_2_DEPTH, mode=Mode.SUBTRACT)

    # Sketch164 → Cut-Extrude20 (cut, through all)
    with BuildSketch(Plane(origin=(0, 42, 0), x_dir=(1, 0, 0), z_dir=(0, 1, 0))):
        with Locations(Location((-49, 23, 0), (0, 0, 270))):
            Circle(SKETCH164_R)
        with BuildLine():
            Line((-20, 7), (-22, 7))
            ThreePointArc((-22, 7), (-24, 9), (-22, 11))
            Line((-22, 11), (-20, 11))
            ThreePointArc((-20, 11), (-18, 9), (-20, 7))
        make_face()
        with BuildLine():
            Line((-60, 11), (-58, 11))
            ThreePointArc((-58, 11), (-56, 9), (-58, 7))
            Line((-58, 7), (-60, 7))
            ThreePointArc((-60, 7), (-62, 9), (-60, 11))
        make_face()
        with BuildLine():
            Line((-60, 35), (-58, 35))
            ThreePointArc((-58, 35), (-56, 37), (-58, 39))
            Line((-58, 39), (-60, 39))
            ThreePointArc((-60, 39), (-62, 37), (-60, 35))
        make_face()
        with BuildLine():
            Line((-20, 39), (-22, 39))
            ThreePointArc((-22, 39), (-24, 37), (-22, 35))
            Line((-22, 35), (-20, 35))
            ThreePointArc((-20, 35), (-18, 37), (-20, 39))
        make_face()
    extrude(amount=-CUT_EXTRUDE20_DEPTH, mode=Mode.SUBTRACT)

    # Sketch166 → Cut-Extrude21 (cut)
    with BuildSketch(Plane(origin=(86.397114317, 0, -49.881397208), x_dir=(-0.4999999999999983, 0, -0.8660254037844397), z_dir=(0.8660254037844396, 0, -0.4999999999999982))):
        with Locations((-24.152476086, -66)):
            Circle(SKETCH166_R)
    extrude(amount=-CUT_EXTRUDE21_DEPTH, mode=Mode.SUBTRACT)

    # Sketch167 → Cut-Extrude24 (cut)
    with BuildSketch(Plane(origin=(86.397114317, 0, -49.881397208), x_dir=(-0.4999999999999983, 0, -0.8660254037844397), z_dir=(0.8660254037844396, 0, -0.4999999999999982))):
        with Locations((-24.152476086, 66)):
            Circle(SKETCH167_R)
    extrude(amount=-CUT_EXTRUDE24_DEPTH, mode=Mode.SUBTRACT)

    # Sketch170 → Cut-Extrude25 (cut)
    with BuildSketch(Plane.ZY.offset(81)):
        with Locations((-31.38, 66.11)):
            Circle(SKETCH170_R)
        with Locations((-31.38, -66.11)):
            Circle(SKETCH170_R)
    extrude(amount=-CUT_EXTRUDE25_DEPTH, mode=Mode.SUBTRACT)


solid = part.part
